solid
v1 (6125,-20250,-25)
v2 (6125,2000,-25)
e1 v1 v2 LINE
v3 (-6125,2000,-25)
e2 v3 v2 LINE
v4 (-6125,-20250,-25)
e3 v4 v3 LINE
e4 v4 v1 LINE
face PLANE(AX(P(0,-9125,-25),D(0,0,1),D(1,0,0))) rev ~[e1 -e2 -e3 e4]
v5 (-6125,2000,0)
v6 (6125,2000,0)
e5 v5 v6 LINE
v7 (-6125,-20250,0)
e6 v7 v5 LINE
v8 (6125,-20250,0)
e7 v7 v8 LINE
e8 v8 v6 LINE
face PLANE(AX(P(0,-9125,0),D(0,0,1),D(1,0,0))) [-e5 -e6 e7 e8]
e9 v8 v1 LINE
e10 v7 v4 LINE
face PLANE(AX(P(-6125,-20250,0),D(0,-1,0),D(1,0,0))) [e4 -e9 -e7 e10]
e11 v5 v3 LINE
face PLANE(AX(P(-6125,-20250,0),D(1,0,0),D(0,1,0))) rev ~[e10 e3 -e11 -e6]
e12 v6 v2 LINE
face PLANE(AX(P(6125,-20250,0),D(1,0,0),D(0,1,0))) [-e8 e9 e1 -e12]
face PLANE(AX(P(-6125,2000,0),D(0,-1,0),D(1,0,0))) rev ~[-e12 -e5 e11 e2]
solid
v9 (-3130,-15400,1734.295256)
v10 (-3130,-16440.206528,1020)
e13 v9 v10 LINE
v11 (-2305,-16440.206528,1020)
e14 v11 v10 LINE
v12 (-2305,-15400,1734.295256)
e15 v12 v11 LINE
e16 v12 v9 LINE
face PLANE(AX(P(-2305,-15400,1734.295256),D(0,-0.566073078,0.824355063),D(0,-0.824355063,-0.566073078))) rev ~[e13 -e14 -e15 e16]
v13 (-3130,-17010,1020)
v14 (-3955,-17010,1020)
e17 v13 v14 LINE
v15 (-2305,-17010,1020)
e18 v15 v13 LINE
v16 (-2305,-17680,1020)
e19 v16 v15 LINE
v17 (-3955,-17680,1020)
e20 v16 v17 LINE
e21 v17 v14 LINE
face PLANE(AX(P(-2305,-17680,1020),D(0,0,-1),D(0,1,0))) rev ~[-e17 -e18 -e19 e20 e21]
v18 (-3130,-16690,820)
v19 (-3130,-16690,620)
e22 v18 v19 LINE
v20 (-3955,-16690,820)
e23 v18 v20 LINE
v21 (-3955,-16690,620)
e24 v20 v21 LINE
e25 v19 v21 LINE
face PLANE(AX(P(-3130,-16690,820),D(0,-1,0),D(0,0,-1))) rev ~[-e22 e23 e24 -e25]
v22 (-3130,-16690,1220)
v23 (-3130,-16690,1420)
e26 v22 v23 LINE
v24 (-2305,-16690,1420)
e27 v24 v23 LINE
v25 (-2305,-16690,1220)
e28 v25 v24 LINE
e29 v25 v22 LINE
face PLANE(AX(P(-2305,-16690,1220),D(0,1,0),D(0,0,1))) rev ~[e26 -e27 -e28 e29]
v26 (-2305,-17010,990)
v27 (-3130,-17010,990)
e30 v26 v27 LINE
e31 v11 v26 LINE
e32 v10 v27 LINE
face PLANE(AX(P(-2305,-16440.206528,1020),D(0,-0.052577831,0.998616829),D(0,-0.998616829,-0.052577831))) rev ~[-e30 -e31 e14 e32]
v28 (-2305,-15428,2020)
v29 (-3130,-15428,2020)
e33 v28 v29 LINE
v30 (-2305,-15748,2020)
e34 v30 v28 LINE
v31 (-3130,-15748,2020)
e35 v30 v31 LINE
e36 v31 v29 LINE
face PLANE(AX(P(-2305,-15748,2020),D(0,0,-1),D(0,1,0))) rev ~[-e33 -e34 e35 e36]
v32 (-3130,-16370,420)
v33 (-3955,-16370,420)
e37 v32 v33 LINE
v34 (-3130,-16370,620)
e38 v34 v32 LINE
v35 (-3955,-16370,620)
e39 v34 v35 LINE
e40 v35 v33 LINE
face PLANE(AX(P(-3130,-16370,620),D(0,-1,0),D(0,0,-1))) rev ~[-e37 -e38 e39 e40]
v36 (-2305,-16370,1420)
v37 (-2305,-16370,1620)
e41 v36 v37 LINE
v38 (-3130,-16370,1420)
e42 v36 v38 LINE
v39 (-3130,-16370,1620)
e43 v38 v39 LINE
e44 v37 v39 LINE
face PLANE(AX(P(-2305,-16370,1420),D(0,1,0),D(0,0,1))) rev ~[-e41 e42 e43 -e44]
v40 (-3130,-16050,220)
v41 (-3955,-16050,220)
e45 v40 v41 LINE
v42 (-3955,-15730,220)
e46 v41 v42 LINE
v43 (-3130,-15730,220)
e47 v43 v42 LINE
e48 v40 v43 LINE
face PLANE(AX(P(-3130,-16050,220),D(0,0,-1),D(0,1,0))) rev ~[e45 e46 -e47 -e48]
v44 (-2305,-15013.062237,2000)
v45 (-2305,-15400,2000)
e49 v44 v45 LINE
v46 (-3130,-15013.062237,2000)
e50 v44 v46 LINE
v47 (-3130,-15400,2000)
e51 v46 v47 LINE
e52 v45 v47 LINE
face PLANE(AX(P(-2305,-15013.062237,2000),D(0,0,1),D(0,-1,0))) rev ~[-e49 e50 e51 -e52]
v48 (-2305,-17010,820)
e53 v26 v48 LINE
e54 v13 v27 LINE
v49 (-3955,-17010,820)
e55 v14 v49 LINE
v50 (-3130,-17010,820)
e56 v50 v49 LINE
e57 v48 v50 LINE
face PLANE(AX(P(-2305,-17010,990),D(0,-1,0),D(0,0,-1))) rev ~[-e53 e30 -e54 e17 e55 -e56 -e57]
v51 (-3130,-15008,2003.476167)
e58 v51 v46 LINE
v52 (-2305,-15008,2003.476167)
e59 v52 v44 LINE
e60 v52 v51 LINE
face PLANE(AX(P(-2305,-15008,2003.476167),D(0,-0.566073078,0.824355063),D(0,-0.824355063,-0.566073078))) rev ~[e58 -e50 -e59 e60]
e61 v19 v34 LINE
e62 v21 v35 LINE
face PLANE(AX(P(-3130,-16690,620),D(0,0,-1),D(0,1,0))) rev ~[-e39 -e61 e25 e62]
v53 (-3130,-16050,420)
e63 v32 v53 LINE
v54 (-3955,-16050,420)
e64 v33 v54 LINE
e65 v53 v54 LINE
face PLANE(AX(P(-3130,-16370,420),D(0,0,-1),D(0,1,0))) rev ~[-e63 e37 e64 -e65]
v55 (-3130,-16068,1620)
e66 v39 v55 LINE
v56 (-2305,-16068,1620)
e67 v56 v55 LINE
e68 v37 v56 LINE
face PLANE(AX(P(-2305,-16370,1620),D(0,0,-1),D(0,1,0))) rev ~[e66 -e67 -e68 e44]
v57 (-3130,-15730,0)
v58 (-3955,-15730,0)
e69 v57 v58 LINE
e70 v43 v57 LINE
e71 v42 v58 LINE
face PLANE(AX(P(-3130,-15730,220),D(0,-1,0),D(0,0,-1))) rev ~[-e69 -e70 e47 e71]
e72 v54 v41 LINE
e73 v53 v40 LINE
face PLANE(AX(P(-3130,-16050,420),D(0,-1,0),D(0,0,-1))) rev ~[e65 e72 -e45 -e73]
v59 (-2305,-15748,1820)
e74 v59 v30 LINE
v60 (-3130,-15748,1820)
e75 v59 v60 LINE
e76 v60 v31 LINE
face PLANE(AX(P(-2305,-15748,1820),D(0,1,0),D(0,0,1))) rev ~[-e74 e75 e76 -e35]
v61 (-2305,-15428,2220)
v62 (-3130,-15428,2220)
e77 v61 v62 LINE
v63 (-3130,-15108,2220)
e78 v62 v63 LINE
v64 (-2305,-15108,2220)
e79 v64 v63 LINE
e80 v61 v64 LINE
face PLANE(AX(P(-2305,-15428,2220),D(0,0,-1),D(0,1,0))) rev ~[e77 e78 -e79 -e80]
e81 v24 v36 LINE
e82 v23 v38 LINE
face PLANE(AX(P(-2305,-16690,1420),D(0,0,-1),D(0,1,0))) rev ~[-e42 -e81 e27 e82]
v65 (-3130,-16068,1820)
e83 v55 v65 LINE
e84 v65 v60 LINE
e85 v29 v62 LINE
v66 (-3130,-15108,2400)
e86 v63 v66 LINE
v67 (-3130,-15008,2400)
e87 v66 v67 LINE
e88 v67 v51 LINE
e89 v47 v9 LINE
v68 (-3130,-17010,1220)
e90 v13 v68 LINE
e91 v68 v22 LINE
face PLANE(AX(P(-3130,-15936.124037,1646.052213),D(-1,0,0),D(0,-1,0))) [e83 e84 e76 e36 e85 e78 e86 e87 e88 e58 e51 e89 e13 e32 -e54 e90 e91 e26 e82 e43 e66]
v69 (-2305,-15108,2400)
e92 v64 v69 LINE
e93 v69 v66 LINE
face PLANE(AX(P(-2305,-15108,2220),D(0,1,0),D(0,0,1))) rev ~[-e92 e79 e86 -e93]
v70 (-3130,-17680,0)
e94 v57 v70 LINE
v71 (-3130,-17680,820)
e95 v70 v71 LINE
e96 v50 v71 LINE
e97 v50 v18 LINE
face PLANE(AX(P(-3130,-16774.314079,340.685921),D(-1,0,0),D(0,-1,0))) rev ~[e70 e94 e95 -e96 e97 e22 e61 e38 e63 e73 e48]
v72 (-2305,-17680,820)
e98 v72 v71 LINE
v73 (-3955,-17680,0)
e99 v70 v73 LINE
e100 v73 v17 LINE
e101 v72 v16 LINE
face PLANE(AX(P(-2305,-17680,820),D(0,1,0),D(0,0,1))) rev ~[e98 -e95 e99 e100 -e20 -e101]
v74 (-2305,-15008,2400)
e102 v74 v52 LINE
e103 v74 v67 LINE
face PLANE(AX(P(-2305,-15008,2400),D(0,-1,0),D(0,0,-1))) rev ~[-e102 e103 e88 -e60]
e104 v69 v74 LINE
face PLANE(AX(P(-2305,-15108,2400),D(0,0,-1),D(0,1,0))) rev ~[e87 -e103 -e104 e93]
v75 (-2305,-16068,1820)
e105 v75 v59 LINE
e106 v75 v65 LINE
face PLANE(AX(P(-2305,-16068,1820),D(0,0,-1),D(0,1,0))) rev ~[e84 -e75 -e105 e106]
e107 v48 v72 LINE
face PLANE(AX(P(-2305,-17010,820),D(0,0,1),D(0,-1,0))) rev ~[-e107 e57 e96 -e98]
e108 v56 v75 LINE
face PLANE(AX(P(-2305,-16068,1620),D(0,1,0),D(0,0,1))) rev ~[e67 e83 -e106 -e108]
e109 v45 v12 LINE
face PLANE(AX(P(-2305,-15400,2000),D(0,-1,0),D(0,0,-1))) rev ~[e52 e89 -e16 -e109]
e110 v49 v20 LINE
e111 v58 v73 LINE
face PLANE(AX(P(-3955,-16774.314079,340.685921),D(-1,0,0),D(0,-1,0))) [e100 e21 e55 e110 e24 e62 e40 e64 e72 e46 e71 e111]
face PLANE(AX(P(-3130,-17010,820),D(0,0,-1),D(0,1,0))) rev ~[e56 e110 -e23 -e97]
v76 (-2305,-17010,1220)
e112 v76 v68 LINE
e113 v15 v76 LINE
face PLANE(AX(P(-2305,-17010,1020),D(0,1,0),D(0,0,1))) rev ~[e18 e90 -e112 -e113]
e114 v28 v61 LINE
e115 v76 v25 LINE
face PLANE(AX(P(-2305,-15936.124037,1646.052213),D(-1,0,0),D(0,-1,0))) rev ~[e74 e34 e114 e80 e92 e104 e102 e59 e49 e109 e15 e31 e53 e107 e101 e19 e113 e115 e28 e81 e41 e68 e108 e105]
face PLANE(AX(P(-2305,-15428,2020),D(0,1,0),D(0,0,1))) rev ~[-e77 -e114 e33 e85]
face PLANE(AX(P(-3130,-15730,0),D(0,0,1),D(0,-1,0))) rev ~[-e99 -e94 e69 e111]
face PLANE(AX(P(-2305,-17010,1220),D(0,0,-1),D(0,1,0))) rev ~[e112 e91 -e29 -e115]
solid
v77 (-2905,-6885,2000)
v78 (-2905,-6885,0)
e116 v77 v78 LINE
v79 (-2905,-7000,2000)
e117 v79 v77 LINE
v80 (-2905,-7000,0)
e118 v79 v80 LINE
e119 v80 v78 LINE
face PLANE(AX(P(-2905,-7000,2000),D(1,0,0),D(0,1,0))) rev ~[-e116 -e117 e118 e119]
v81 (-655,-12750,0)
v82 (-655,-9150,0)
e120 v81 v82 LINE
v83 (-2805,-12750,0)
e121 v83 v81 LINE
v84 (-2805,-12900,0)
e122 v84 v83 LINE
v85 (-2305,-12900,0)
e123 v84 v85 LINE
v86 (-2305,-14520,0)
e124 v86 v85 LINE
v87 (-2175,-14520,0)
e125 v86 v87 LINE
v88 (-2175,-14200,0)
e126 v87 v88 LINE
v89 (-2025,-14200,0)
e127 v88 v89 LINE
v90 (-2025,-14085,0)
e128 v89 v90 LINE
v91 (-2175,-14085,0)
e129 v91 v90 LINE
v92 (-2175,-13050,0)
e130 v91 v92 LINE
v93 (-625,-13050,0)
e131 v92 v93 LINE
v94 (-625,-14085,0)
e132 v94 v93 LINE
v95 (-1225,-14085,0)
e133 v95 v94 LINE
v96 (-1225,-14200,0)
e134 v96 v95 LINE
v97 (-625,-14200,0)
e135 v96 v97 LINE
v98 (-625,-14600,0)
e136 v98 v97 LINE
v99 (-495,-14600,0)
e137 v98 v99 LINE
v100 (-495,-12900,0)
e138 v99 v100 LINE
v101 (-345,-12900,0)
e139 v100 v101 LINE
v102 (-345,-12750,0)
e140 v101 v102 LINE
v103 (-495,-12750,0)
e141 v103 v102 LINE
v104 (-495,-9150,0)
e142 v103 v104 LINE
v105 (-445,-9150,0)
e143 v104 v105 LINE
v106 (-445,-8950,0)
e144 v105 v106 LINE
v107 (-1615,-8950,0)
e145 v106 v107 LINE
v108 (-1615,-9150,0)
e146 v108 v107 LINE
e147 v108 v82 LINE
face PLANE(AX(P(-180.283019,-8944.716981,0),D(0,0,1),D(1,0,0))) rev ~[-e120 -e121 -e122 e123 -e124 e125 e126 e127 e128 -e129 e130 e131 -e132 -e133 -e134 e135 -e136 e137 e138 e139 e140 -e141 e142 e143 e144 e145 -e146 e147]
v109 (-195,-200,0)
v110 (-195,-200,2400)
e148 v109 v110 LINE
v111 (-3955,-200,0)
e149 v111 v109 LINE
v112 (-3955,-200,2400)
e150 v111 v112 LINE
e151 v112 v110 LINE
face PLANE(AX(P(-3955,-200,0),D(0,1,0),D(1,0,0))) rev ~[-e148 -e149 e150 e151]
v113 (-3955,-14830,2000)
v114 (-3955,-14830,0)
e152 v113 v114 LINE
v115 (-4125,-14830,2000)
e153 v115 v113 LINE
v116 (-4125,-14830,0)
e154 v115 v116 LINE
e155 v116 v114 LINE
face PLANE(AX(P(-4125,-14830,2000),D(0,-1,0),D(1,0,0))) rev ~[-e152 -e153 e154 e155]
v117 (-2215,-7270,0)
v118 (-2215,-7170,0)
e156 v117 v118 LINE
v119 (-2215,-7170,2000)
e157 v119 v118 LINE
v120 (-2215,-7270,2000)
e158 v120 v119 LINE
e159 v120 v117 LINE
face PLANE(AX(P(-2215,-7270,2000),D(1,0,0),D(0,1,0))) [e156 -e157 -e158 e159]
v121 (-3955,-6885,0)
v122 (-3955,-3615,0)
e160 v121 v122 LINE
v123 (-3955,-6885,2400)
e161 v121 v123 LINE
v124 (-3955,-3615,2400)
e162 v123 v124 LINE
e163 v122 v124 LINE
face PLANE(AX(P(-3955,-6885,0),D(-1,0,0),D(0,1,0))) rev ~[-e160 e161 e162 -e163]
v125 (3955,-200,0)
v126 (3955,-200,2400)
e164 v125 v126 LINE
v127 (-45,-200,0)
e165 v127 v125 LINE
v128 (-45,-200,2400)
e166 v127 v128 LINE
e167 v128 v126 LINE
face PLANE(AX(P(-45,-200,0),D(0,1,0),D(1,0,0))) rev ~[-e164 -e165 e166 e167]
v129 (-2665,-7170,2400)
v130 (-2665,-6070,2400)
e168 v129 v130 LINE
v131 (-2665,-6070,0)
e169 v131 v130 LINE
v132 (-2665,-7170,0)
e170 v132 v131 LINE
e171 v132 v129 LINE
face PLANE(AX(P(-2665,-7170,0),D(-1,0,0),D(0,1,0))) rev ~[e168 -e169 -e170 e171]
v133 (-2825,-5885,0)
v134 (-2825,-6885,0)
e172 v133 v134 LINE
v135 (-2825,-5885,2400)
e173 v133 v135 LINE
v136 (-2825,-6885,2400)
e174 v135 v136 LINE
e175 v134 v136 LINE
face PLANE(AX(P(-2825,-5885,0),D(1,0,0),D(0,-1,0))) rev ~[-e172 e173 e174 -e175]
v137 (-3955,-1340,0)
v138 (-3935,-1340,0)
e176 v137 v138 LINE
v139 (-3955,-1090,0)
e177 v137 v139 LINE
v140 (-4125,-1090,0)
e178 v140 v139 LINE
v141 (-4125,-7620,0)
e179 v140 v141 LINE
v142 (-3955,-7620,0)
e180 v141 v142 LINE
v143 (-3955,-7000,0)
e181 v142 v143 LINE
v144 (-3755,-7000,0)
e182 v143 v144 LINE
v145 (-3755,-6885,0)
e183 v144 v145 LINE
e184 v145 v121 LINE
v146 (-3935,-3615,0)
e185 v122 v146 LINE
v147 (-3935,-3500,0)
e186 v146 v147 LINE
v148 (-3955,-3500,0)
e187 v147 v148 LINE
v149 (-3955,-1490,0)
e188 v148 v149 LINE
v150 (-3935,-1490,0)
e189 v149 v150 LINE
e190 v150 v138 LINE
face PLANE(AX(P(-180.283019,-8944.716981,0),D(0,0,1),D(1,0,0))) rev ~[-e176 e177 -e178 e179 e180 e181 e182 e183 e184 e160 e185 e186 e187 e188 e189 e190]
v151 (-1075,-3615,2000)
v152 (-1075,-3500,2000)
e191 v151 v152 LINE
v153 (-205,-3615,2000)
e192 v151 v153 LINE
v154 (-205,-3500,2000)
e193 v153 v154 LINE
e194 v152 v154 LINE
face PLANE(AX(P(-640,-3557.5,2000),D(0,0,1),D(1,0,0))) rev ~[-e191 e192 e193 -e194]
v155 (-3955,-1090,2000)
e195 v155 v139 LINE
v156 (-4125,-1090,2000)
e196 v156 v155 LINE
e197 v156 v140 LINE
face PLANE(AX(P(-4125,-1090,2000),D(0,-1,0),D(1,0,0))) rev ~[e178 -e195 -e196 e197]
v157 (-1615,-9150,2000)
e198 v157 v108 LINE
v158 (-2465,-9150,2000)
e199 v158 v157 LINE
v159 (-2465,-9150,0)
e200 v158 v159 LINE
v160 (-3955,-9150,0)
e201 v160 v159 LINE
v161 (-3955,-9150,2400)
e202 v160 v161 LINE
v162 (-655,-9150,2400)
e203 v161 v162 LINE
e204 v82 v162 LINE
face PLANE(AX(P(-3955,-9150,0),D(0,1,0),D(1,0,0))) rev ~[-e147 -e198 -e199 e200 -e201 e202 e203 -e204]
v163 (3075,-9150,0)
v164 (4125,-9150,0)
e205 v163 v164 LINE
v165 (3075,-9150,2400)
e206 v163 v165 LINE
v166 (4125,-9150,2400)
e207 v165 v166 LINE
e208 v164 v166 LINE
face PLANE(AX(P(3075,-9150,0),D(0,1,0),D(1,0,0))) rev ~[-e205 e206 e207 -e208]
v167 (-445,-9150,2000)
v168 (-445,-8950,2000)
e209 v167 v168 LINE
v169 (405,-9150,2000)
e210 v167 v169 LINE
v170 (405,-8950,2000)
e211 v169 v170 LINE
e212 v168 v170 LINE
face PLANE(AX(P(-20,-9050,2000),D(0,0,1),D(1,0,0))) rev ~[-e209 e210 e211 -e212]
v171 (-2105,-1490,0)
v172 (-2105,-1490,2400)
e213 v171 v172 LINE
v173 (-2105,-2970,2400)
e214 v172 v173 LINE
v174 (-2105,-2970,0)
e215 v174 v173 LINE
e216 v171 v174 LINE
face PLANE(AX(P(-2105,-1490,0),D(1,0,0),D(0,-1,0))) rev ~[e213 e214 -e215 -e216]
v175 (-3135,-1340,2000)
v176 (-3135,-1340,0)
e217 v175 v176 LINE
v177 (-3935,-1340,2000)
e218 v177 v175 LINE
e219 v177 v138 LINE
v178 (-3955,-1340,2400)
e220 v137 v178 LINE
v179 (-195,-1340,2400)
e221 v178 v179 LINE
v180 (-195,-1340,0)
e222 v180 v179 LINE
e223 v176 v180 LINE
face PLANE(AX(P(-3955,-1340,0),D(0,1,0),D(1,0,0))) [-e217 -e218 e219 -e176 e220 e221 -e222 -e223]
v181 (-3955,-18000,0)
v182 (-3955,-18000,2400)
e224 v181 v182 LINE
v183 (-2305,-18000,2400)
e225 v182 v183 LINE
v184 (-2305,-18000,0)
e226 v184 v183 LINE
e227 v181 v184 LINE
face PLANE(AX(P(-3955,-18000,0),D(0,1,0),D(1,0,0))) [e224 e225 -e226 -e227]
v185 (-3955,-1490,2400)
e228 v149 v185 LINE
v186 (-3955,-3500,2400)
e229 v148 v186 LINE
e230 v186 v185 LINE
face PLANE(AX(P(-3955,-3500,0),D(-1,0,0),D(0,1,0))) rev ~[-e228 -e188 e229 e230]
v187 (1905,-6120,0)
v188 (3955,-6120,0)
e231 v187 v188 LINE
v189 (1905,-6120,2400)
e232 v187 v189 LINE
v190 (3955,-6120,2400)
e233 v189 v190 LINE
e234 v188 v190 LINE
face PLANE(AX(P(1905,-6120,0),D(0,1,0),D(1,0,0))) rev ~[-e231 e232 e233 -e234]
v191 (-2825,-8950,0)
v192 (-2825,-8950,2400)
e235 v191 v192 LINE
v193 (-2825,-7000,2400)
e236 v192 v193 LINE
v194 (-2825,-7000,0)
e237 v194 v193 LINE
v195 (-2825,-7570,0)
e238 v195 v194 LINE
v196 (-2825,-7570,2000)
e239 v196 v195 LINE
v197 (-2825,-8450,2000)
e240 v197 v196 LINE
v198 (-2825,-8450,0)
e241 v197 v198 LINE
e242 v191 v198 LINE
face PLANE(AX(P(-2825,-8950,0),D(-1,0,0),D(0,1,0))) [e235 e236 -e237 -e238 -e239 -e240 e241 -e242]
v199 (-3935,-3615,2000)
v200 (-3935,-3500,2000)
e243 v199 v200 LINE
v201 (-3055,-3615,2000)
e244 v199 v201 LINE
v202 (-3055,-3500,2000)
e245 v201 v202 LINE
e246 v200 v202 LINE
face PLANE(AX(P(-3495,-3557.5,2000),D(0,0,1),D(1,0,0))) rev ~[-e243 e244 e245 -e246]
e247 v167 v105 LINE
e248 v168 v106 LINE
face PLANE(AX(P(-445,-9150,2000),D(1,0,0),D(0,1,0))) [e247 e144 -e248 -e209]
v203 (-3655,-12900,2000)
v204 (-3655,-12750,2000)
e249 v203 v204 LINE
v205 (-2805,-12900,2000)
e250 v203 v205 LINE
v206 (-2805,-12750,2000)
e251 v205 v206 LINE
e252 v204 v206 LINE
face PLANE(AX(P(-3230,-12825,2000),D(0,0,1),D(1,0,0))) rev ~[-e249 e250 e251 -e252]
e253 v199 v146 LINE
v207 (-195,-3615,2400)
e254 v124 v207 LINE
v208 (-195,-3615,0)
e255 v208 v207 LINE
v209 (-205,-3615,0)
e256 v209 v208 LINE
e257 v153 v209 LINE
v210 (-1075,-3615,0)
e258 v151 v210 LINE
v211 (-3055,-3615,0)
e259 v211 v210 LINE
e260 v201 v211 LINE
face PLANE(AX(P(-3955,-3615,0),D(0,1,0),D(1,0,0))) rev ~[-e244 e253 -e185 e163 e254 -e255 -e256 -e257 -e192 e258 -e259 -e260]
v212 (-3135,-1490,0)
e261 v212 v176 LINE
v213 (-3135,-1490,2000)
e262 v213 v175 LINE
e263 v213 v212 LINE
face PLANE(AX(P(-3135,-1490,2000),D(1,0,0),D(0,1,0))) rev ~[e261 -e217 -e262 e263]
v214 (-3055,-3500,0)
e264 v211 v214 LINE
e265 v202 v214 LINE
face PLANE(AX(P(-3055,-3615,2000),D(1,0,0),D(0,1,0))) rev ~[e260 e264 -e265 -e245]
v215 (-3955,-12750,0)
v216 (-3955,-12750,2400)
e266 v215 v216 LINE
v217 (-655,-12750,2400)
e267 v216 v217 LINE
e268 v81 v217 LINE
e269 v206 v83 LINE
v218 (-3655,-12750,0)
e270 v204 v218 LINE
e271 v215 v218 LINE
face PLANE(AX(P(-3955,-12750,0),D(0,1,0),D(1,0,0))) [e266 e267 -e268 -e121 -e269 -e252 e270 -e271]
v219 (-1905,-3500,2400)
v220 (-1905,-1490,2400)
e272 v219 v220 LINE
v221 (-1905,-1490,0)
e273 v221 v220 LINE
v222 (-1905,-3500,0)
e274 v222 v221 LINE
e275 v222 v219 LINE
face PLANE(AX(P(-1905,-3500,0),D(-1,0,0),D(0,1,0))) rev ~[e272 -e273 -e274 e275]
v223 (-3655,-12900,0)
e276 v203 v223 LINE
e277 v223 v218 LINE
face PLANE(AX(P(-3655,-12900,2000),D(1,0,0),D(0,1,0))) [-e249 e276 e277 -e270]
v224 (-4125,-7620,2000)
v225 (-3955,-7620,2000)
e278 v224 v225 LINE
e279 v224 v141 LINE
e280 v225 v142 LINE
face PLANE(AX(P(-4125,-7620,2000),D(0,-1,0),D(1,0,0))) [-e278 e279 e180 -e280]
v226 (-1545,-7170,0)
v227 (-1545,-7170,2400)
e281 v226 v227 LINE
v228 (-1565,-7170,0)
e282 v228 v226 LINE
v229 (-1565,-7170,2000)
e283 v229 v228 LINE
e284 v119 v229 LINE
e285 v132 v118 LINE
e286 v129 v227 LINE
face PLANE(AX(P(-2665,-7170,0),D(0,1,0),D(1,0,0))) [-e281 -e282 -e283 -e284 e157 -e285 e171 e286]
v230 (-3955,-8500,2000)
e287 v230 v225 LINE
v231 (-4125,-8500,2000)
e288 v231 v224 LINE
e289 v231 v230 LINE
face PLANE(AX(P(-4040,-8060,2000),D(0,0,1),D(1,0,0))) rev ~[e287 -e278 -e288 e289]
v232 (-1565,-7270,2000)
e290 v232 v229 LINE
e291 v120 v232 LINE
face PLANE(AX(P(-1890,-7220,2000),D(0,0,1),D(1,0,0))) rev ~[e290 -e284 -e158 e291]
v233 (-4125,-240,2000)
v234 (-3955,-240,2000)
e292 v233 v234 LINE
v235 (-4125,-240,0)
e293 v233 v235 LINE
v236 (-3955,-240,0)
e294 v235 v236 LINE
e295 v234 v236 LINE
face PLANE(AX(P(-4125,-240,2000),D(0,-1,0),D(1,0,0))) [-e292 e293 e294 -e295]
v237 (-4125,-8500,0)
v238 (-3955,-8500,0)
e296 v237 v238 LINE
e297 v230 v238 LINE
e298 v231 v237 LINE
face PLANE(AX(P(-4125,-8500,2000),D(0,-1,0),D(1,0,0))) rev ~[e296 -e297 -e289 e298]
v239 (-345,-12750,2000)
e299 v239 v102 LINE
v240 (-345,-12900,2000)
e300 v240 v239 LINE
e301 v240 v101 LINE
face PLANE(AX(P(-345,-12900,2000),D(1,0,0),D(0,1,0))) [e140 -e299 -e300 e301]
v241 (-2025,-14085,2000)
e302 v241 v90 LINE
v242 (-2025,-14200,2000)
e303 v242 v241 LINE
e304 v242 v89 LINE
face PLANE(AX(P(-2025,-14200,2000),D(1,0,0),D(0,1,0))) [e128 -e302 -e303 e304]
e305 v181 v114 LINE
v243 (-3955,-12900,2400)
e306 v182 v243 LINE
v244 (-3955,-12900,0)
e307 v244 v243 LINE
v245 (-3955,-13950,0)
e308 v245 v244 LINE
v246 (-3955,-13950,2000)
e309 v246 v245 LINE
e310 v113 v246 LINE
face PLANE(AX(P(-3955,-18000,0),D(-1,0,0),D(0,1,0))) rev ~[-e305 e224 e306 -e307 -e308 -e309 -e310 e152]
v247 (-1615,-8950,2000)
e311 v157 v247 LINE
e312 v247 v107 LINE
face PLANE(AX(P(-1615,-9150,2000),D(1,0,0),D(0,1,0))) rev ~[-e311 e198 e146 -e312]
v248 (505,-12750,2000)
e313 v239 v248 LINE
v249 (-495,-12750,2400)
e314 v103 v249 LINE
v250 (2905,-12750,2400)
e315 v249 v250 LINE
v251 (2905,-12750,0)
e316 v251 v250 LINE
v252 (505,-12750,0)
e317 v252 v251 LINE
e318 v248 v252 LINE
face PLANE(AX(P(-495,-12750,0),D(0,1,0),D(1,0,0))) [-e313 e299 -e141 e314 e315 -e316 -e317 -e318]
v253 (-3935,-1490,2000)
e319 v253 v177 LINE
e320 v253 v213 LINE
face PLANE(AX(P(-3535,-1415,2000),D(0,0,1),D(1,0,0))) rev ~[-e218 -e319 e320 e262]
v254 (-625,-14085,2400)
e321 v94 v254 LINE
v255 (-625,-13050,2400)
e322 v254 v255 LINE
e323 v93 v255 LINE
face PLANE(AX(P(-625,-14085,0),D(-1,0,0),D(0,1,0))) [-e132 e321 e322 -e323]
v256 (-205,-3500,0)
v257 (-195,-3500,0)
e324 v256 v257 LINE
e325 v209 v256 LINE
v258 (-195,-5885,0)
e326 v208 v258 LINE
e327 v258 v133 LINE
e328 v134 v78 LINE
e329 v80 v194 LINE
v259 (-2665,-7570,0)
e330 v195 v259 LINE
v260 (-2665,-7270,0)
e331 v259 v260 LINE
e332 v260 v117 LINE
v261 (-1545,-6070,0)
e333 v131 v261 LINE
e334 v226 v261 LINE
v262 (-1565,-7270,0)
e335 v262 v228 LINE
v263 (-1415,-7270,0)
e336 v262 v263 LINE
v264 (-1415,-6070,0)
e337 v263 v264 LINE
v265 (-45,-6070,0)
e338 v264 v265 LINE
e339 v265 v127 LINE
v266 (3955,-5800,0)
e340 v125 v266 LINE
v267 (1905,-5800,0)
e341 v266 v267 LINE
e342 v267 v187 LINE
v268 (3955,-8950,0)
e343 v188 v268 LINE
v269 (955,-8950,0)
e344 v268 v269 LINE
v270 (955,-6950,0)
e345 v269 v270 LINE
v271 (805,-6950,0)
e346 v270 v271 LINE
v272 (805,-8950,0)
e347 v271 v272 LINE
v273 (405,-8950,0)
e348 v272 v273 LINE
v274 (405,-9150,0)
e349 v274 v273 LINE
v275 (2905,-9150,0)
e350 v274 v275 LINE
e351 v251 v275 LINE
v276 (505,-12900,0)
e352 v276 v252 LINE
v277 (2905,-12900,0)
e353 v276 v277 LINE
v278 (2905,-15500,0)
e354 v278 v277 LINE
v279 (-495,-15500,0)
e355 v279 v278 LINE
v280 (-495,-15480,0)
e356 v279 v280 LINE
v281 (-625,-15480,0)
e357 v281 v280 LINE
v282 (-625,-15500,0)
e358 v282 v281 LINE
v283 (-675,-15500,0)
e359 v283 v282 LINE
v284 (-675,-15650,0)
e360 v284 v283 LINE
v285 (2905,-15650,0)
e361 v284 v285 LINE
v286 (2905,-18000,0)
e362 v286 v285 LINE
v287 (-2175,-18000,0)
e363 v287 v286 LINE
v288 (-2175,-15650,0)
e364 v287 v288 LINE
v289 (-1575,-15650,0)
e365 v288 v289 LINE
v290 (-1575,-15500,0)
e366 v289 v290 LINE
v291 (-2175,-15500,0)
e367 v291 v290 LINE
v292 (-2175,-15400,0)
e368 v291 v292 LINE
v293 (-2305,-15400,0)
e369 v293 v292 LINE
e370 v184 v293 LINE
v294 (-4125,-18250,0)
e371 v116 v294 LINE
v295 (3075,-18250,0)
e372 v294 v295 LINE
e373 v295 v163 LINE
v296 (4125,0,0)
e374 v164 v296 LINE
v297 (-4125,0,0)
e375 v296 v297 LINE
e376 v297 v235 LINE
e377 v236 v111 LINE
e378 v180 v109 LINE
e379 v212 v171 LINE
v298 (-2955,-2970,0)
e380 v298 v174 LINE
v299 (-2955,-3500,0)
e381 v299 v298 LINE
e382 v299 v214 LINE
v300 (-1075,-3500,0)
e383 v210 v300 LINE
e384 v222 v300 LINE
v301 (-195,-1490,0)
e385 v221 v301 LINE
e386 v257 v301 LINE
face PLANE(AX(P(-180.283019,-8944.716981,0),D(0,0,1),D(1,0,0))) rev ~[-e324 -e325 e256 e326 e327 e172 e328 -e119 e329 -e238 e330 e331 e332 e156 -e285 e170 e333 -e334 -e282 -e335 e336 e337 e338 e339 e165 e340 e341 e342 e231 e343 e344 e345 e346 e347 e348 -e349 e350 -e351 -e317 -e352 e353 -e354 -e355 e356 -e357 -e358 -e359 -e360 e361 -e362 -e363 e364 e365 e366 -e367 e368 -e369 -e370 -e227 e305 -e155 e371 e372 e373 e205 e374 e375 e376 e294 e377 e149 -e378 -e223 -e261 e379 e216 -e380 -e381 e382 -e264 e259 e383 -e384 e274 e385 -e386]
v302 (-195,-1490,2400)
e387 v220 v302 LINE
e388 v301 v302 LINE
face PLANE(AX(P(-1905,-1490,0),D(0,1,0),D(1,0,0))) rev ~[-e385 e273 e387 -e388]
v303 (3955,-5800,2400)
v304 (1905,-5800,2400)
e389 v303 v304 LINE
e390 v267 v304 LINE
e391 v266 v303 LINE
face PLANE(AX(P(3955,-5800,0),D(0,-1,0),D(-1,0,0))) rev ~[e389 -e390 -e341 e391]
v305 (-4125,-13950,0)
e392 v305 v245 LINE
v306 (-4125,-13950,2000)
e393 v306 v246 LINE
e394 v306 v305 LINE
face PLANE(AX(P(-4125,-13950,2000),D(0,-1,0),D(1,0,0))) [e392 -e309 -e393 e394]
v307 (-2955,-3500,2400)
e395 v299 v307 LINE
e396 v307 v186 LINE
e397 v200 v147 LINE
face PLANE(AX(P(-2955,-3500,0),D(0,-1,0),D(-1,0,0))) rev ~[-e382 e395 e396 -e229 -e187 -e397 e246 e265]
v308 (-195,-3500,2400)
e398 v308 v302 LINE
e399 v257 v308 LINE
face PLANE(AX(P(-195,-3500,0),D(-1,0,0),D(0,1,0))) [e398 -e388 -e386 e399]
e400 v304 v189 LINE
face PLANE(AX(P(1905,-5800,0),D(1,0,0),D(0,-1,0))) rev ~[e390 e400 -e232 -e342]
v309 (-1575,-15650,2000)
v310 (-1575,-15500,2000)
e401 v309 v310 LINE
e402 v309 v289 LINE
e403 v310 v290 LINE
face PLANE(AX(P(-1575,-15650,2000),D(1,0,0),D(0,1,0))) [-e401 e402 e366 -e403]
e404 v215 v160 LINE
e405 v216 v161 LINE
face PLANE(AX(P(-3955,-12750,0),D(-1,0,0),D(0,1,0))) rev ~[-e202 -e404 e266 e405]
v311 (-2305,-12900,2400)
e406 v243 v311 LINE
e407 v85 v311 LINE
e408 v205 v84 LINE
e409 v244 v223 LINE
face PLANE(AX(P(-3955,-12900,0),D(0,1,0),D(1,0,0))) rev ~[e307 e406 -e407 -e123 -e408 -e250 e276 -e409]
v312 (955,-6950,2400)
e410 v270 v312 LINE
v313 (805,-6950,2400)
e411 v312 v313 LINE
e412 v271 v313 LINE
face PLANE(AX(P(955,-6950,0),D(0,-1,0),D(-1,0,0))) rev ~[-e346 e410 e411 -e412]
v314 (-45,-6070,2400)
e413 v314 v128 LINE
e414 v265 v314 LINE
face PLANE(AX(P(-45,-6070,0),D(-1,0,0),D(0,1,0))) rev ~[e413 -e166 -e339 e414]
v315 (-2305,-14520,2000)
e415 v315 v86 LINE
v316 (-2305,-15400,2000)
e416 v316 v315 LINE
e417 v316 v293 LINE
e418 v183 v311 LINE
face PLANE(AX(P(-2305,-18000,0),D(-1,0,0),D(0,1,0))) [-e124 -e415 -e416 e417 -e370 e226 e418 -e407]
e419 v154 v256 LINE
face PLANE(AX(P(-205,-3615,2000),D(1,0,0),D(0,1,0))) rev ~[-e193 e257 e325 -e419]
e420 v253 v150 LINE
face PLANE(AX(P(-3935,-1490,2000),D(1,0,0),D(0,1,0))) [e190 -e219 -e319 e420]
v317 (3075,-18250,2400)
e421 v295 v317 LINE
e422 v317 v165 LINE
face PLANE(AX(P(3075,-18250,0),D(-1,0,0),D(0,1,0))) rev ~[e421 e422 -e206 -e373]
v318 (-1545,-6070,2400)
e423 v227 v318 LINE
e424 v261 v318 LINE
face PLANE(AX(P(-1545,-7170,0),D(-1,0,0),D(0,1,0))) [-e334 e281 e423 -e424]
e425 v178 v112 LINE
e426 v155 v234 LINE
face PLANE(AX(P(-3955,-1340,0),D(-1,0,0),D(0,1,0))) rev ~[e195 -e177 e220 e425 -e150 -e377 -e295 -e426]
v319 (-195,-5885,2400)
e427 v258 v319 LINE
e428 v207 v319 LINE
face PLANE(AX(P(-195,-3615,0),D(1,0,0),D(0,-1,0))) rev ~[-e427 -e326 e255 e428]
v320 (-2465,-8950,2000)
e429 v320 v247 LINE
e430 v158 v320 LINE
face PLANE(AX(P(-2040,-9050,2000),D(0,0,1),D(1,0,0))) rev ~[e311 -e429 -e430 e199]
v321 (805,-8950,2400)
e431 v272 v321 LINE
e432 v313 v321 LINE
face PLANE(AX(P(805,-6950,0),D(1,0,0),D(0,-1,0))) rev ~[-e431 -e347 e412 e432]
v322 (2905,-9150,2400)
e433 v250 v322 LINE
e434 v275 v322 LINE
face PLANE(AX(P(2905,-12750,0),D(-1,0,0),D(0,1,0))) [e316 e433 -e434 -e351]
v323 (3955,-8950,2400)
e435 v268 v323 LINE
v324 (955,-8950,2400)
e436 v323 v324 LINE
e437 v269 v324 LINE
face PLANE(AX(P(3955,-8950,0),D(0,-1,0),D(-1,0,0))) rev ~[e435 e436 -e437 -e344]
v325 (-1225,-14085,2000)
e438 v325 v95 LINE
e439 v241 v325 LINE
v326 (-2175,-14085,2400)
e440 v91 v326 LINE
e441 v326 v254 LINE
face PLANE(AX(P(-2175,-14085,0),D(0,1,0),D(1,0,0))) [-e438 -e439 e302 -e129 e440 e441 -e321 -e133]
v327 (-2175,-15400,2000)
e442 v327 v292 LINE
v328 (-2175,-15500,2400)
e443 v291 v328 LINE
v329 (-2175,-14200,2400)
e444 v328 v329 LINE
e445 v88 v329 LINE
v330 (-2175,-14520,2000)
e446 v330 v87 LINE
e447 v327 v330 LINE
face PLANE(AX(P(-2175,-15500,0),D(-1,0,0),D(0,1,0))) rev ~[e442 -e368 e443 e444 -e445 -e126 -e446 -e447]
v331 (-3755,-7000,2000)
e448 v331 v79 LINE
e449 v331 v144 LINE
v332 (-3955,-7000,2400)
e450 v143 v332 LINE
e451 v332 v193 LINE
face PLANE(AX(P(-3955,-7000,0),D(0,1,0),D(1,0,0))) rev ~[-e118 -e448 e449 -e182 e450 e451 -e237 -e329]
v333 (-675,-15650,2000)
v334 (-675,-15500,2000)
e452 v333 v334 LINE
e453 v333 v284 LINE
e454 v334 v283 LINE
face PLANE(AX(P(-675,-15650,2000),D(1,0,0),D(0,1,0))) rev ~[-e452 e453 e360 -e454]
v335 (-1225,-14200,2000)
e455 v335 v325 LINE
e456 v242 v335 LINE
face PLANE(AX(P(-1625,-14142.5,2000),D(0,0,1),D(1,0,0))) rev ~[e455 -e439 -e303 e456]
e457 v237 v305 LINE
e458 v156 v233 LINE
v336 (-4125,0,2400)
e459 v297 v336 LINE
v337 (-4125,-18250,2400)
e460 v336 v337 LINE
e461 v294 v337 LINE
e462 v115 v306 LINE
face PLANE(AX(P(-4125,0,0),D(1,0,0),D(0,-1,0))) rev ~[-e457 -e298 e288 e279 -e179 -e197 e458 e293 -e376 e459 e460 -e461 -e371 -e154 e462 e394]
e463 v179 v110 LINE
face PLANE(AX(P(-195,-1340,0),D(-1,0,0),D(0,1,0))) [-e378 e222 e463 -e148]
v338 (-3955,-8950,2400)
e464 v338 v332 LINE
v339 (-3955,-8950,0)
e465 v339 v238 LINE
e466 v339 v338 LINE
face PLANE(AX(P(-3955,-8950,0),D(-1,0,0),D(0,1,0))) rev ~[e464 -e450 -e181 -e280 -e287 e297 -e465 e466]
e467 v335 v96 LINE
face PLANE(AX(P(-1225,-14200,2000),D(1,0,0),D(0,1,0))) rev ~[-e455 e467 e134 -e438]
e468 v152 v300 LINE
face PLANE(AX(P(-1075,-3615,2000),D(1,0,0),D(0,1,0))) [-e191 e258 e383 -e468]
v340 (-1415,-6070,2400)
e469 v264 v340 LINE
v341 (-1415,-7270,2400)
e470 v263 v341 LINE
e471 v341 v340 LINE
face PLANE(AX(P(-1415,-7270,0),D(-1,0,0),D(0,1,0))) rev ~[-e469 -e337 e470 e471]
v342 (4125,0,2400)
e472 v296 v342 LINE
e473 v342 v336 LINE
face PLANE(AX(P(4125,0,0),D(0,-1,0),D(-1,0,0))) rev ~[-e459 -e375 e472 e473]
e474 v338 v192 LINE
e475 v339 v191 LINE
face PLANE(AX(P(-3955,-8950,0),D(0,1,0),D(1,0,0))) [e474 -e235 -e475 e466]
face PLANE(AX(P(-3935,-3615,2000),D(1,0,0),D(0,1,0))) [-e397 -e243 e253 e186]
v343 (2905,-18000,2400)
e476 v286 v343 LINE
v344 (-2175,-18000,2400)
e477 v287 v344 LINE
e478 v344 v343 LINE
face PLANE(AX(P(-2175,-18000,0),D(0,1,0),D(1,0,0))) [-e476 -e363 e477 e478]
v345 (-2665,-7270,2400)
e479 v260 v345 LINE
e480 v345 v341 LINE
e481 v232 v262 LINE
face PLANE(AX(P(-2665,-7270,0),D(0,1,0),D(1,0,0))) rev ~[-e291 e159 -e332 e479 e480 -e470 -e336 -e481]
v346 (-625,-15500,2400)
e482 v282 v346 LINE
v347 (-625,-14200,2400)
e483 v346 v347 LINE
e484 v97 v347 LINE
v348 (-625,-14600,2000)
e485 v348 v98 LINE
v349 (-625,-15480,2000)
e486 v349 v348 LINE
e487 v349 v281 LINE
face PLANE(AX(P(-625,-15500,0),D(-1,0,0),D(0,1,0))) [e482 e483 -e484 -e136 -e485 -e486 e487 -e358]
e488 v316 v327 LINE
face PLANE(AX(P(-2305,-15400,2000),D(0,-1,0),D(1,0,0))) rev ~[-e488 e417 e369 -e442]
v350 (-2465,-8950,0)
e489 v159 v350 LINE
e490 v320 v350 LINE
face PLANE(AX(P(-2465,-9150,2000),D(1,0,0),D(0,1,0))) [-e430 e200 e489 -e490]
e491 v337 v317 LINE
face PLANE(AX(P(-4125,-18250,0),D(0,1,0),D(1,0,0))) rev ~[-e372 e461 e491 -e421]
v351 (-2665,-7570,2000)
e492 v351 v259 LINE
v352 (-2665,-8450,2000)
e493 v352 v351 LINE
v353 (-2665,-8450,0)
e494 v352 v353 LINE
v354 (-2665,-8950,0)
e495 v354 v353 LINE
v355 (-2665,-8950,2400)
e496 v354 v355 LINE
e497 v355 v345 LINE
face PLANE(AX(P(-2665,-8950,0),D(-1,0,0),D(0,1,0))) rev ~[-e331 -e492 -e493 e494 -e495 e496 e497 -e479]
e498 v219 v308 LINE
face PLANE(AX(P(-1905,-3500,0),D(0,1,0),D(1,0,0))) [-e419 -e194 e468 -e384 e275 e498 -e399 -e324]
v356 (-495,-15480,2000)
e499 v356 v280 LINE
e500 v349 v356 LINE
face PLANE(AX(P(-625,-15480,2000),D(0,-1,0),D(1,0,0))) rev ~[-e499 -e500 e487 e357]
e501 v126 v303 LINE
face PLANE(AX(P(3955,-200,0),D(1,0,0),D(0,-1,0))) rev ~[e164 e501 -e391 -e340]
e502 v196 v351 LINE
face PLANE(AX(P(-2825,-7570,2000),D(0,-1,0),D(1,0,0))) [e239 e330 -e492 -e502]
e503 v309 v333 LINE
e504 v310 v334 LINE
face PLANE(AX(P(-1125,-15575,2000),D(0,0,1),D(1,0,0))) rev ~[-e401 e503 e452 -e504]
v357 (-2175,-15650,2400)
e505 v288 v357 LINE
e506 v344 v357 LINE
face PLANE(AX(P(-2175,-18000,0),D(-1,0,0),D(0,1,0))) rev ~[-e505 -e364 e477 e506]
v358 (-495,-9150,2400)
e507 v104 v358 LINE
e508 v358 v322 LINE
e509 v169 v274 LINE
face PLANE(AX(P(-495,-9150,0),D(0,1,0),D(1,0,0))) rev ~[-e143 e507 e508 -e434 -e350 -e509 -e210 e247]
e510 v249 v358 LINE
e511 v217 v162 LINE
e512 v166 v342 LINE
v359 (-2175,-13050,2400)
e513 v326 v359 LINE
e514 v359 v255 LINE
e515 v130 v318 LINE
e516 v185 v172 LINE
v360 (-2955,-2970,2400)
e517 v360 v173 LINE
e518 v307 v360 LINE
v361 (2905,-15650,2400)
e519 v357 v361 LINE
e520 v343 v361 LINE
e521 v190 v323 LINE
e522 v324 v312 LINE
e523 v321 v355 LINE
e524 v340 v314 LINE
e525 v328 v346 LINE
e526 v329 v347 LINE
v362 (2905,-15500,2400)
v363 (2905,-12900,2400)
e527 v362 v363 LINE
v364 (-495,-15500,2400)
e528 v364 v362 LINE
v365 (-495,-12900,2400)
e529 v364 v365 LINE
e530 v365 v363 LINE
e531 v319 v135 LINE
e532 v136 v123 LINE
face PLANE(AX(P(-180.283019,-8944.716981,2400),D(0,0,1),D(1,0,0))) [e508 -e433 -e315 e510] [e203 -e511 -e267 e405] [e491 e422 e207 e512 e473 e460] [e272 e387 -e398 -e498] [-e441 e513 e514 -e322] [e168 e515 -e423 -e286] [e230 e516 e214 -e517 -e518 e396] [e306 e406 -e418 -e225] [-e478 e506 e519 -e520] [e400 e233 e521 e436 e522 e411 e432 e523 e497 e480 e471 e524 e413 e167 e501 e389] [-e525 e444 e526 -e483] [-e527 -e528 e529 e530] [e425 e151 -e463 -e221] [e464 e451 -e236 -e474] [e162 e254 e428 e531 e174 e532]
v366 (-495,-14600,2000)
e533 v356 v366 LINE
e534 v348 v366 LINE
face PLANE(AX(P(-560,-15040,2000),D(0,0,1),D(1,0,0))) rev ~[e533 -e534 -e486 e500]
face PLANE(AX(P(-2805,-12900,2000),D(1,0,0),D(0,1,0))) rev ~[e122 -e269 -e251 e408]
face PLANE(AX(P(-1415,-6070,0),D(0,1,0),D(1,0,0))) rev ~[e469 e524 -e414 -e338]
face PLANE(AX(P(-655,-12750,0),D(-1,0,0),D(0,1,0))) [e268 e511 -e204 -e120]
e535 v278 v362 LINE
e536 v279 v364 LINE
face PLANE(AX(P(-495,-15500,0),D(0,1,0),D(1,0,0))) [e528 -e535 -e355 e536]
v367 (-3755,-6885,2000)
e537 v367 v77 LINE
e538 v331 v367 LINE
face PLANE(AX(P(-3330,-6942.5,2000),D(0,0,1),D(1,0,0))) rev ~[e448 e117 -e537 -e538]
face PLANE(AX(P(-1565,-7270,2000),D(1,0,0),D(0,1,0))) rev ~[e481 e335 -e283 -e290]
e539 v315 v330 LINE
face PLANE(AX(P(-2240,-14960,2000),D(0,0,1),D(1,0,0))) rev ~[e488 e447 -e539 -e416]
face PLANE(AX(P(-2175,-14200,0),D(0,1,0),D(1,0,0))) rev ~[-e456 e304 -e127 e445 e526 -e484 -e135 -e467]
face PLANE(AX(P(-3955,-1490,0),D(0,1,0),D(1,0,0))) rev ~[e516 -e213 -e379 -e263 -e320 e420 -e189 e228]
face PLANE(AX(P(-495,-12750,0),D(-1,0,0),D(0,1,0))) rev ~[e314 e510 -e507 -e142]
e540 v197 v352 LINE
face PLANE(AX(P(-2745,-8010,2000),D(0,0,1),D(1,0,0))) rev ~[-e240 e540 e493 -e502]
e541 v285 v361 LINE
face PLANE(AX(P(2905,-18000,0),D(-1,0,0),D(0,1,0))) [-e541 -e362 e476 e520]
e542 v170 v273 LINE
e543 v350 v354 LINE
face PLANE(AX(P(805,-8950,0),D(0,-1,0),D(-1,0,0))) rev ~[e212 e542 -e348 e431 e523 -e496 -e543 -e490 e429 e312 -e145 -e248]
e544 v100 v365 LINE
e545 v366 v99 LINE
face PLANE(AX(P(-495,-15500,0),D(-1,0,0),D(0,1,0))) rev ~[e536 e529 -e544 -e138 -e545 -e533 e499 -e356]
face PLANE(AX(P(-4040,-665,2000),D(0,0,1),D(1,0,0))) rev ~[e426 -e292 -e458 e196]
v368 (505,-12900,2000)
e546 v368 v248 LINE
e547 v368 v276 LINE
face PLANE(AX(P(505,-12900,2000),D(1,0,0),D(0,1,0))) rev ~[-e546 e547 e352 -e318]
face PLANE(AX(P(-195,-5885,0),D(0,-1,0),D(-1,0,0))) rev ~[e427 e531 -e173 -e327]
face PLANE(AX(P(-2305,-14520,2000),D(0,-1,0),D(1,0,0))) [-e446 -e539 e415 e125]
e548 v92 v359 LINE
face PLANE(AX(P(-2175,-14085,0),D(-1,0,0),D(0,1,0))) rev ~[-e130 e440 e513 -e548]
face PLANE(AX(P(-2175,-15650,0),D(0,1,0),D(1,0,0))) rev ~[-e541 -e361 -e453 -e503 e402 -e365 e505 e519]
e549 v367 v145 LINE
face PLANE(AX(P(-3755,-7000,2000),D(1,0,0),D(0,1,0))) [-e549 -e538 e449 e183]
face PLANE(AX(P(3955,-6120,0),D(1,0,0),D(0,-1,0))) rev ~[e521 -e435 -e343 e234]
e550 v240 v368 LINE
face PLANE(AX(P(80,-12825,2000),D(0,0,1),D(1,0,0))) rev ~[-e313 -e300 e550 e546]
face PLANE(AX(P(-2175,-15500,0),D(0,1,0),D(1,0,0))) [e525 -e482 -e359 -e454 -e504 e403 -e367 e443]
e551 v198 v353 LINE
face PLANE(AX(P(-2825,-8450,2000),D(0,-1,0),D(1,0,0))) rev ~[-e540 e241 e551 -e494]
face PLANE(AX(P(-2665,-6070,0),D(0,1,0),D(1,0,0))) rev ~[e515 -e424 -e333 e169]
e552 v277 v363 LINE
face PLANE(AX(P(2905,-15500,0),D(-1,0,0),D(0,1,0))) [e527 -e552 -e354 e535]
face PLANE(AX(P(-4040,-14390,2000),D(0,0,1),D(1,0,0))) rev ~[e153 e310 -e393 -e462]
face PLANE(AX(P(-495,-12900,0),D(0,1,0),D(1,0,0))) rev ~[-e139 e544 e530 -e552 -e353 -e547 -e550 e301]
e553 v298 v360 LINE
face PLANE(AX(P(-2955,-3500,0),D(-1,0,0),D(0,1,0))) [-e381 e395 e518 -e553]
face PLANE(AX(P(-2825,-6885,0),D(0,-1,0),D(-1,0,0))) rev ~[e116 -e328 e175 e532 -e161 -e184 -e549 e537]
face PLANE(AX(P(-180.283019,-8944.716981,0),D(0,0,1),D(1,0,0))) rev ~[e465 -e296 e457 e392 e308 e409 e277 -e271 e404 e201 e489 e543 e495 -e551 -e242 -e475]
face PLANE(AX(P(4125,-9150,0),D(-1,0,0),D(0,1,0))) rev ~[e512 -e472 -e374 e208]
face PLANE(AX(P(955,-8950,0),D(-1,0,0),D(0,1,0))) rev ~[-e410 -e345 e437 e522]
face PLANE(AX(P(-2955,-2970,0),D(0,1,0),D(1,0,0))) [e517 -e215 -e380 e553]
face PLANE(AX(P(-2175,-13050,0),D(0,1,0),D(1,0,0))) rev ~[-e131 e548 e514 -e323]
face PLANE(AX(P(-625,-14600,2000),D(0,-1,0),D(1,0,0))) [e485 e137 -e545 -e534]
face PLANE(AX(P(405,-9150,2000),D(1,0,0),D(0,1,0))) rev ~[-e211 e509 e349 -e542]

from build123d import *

# Parameters (mm, degrees)
F0_W     = 1650
F0_H     = 5100
F0_W_2   = 1550
F0_H_2   = 1300
F0_W_3   = 3300
F0_H_3   = 3600
F0_H_4   = 1035
F0_W_4   = 5080
F0_H_5   = 2350
F0_W_5   = 3400
F0_H_6   = 2600
F0_W_6   = 1130
F0_H_7   = 1950
F0_W_7   = 1120
F0_H_8   = 1100
F0_W_8   = 3760
F0_H_9   = 1140
F0_W_9   = 1710
F0_H_10  = 2010
F0_W_10  = 850
F0_H_11  = 530
F1_DEPTH = 2400
F3_START = -400
F2_W     = 170
F2_H     = 850
F2_W_2   = 800
F2_H_2   = 150
F2_W_3   = 880
F2_H_3   = 115
F2_W_4   = 870
F2_W_5   = 850
F2_H_4   = 880
F2_W_6   = 650
F2_H_5   = 100
F2_W_7   = 160
F2_H_6   = 200
F2_W_8   = 130
F2_W_9   = 900
F3_DEPTH = 2000
F4_W     = 12250
F4_H     = 22250
F5_DEPTH = 25
F7_START = 825
F7_DEPTH = 825
F8_DEPTH = 825


with BuildPart() as f1:
    # F0 (on Top) → F1 (new body)
    with BuildSketch(Plane.XY):
        Polygon((4125, 0), (-4125, 0), (-4125, -9150), (-4125, -18250), (3075, -18250), (3075, -9150), (4125, -9150), align=None)
        with Locations((-3130, -15450)):
            Rectangle(F0_W, F0_H, mode=Mode.SUBTRACT)
        with Locations((-1400, -14850)):
            Rectangle(F0_W_2, F0_H_2, mode=Mode.SUBTRACT)
        with Locations((-2305, -10950)):
            Rectangle(F0_W_3, F0_H_3, mode=Mode.SUBTRACT)
        with Locations((-1400, -13567.5)):
            Rectangle(F0_W_2, F0_H_4, mode=Mode.SUBTRACT)
        with Locations((365, -16825)):
            Rectangle(F0_W_4, F0_H_5, mode=Mode.SUBTRACT)
        with Locations((1205, -14200)):
            Rectangle(F0_W_5, F0_H_6, mode=Mode.SUBTRACT)
        with Locations((1205, -10950)):
            Rectangle(F0_W_5, F0_H_3, mode=Mode.SUBTRACT)
        with Locations((-3390, -7975)):
            Rectangle(F0_W_6, F0_H_7, mode=Mode.SUBTRACT)
        with Locations((-2105, -6620)):
            Rectangle(F0_W_7, F0_H_8, mode=Mode.SUBTRACT)
        Polygon((-3955, -5885), (-3955, -3615), (-195, -3615), (-195, -5885), (-2825, -5885), (-2825, -6885), (-3955, -6885), align=None, mode=Mode.SUBTRACT)
        Polygon((-3955, -3500), (-3955, -1490), (-2105, -1490), (-2105, -2970), (-2105, -3500), (-2955, -3500), align=None, mode=Mode.SUBTRACT)
        with Locations((-2075, -770)):
            Rectangle(F0_W_8, F0_H_9, mode=Mode.SUBTRACT)
        with Locations((-1050, -2495)):
            Rectangle(F0_W_9, F0_H_10, mode=Mode.SUBTRACT)
        Polygon((-45, -6070), (-45, -200), (3955, -200), (3955, -5800), (1905, -5800), (1905, -6120), (3955, -6120), (3955, -8950), (955, -8950), (955, -6950), (805, -6950), (805, -8950), (-2665, -8950), (-2665, -7270), (-1415, -7270), (-1415, -6070), align=None, mode=Mode.SUBTRACT)
        with Locations((-2530, -3235)):
            Rectangle(F0_W_10, F0_H_11)
    extrude(amount=F1_DEPTH)

    # F2 (on face) → F3 (cut)
    with BuildSketch(Plane.XY.offset(2400).offset(F3_START)):
        with Locations((-4040, -665)):
            Rectangle(F2_W, F2_H)
        with Locations((-3535, -1415)):
            Rectangle(F2_W_2, F2_H_2)
        with Locations((-3495, -3557.5)):
            Rectangle(F2_W_3, F2_H_3)
        with Locations((-640, -3557.5)):
            Rectangle(F2_W_4, F2_H_3)
        with Locations((-3330, -6942.5)):
            Rectangle(F2_W_5, F2_H_3)
        with Locations((-4040, -8060)):
            Rectangle(F2_W, F2_H_4)
        with Locations((-1890, -7220)):
            Rectangle(F2_W_6, F2_H_5)
        with Locations((-2745, -8010)):
            Rectangle(F2_W_7, F2_H_4)
        with Locations((-2040, -9050)):
            Rectangle(F2_W_5, F2_H_6)
        with Locations((-20, -9050)):
            Rectangle(F2_W_5, F2_H_6)
        with Locations((-3230, -12825)):
            Rectangle(F2_W_5, F2_H_2)
        with Locations((80, -12825)):
            Rectangle(F2_W_5, F2_H_2)
        with Locations((-1625, -14142.5)):
            Rectangle(F2_W_2, F2_H_3)
        with Locations((-560, -15040)):
            Rectangle(F2_W_8, F2_H_4)
        with Locations((-1125, -15575)):
            Rectangle(F2_W_9, F2_H_2)
        with Locations((-2240, -14960)):
            Rectangle(F2_W_8, F2_H_4)
        with Locations((-4040, -14390)):
            Rectangle(F2_W, F2_H_4)
    extrude(amount=-F3_DEPTH, mode=Mode.SUBTRACT)


with BuildPart() as f5:
    # F4 (on Top) → F5 (new body)
    with BuildSketch(Plane.XY):
        with Locations((0, -9125)):
            Rectangle(F4_W, F4_H)
    extrude(amount=-F5_DEPTH)


with BuildPart() as f7:
    # F6 (on face) → F7 (new body)
    with BuildSketch(Plane(origin=(-2305, 0, 0), x_dir=(0, -1, 0), z_dir=(-1, 0, 0)).offset(F7_START)):
        Polygon((16050, 220), (15730, 220), (15730, 0), (17680, 0), (17680, 820), (17010, 820), (16690, 820), (16690, 620), (16370, 620), (16370, 420), (16050, 420), align=None)
        Polygon((17010, 820), (17680, 820), (17680, 1020), (17010, 1020), (17010, 990), align=None)
    extrude(amount=F7_DEPTH)

    # F6 (on face) → F8 (join)
    with BuildSketch(Plane(origin=(-2305, 0, 0), x_dir=(0, -1, 0), z_dir=(-1, 0, 0))):
        Polygon((15400, 2000), (15400, 1734.2952563354), (16440.20652771, 1020), (17010, 990), (17010, 1020), (17010, 1220), (16690, 1220), (16690, 1420), (16370, 1420), (16370, 1620), (16068, 1620), (16068, 1820), (15748, 1820), (15748, 2020), (15428, 2020), (15428, 2220), (15108, 2220), (15108, 2400), (15008, 2400), (15008, 2003.4761670724), (15013.0622367264, 2000), align=None)
        Polygon((17010, 820), (17680, 820), (17680, 1020), (17010, 1020), (17010, 990), align=None)
    extrude(amount=F8_DEPTH)


solid = Compound([f1.part, f5.part, f7.part])
